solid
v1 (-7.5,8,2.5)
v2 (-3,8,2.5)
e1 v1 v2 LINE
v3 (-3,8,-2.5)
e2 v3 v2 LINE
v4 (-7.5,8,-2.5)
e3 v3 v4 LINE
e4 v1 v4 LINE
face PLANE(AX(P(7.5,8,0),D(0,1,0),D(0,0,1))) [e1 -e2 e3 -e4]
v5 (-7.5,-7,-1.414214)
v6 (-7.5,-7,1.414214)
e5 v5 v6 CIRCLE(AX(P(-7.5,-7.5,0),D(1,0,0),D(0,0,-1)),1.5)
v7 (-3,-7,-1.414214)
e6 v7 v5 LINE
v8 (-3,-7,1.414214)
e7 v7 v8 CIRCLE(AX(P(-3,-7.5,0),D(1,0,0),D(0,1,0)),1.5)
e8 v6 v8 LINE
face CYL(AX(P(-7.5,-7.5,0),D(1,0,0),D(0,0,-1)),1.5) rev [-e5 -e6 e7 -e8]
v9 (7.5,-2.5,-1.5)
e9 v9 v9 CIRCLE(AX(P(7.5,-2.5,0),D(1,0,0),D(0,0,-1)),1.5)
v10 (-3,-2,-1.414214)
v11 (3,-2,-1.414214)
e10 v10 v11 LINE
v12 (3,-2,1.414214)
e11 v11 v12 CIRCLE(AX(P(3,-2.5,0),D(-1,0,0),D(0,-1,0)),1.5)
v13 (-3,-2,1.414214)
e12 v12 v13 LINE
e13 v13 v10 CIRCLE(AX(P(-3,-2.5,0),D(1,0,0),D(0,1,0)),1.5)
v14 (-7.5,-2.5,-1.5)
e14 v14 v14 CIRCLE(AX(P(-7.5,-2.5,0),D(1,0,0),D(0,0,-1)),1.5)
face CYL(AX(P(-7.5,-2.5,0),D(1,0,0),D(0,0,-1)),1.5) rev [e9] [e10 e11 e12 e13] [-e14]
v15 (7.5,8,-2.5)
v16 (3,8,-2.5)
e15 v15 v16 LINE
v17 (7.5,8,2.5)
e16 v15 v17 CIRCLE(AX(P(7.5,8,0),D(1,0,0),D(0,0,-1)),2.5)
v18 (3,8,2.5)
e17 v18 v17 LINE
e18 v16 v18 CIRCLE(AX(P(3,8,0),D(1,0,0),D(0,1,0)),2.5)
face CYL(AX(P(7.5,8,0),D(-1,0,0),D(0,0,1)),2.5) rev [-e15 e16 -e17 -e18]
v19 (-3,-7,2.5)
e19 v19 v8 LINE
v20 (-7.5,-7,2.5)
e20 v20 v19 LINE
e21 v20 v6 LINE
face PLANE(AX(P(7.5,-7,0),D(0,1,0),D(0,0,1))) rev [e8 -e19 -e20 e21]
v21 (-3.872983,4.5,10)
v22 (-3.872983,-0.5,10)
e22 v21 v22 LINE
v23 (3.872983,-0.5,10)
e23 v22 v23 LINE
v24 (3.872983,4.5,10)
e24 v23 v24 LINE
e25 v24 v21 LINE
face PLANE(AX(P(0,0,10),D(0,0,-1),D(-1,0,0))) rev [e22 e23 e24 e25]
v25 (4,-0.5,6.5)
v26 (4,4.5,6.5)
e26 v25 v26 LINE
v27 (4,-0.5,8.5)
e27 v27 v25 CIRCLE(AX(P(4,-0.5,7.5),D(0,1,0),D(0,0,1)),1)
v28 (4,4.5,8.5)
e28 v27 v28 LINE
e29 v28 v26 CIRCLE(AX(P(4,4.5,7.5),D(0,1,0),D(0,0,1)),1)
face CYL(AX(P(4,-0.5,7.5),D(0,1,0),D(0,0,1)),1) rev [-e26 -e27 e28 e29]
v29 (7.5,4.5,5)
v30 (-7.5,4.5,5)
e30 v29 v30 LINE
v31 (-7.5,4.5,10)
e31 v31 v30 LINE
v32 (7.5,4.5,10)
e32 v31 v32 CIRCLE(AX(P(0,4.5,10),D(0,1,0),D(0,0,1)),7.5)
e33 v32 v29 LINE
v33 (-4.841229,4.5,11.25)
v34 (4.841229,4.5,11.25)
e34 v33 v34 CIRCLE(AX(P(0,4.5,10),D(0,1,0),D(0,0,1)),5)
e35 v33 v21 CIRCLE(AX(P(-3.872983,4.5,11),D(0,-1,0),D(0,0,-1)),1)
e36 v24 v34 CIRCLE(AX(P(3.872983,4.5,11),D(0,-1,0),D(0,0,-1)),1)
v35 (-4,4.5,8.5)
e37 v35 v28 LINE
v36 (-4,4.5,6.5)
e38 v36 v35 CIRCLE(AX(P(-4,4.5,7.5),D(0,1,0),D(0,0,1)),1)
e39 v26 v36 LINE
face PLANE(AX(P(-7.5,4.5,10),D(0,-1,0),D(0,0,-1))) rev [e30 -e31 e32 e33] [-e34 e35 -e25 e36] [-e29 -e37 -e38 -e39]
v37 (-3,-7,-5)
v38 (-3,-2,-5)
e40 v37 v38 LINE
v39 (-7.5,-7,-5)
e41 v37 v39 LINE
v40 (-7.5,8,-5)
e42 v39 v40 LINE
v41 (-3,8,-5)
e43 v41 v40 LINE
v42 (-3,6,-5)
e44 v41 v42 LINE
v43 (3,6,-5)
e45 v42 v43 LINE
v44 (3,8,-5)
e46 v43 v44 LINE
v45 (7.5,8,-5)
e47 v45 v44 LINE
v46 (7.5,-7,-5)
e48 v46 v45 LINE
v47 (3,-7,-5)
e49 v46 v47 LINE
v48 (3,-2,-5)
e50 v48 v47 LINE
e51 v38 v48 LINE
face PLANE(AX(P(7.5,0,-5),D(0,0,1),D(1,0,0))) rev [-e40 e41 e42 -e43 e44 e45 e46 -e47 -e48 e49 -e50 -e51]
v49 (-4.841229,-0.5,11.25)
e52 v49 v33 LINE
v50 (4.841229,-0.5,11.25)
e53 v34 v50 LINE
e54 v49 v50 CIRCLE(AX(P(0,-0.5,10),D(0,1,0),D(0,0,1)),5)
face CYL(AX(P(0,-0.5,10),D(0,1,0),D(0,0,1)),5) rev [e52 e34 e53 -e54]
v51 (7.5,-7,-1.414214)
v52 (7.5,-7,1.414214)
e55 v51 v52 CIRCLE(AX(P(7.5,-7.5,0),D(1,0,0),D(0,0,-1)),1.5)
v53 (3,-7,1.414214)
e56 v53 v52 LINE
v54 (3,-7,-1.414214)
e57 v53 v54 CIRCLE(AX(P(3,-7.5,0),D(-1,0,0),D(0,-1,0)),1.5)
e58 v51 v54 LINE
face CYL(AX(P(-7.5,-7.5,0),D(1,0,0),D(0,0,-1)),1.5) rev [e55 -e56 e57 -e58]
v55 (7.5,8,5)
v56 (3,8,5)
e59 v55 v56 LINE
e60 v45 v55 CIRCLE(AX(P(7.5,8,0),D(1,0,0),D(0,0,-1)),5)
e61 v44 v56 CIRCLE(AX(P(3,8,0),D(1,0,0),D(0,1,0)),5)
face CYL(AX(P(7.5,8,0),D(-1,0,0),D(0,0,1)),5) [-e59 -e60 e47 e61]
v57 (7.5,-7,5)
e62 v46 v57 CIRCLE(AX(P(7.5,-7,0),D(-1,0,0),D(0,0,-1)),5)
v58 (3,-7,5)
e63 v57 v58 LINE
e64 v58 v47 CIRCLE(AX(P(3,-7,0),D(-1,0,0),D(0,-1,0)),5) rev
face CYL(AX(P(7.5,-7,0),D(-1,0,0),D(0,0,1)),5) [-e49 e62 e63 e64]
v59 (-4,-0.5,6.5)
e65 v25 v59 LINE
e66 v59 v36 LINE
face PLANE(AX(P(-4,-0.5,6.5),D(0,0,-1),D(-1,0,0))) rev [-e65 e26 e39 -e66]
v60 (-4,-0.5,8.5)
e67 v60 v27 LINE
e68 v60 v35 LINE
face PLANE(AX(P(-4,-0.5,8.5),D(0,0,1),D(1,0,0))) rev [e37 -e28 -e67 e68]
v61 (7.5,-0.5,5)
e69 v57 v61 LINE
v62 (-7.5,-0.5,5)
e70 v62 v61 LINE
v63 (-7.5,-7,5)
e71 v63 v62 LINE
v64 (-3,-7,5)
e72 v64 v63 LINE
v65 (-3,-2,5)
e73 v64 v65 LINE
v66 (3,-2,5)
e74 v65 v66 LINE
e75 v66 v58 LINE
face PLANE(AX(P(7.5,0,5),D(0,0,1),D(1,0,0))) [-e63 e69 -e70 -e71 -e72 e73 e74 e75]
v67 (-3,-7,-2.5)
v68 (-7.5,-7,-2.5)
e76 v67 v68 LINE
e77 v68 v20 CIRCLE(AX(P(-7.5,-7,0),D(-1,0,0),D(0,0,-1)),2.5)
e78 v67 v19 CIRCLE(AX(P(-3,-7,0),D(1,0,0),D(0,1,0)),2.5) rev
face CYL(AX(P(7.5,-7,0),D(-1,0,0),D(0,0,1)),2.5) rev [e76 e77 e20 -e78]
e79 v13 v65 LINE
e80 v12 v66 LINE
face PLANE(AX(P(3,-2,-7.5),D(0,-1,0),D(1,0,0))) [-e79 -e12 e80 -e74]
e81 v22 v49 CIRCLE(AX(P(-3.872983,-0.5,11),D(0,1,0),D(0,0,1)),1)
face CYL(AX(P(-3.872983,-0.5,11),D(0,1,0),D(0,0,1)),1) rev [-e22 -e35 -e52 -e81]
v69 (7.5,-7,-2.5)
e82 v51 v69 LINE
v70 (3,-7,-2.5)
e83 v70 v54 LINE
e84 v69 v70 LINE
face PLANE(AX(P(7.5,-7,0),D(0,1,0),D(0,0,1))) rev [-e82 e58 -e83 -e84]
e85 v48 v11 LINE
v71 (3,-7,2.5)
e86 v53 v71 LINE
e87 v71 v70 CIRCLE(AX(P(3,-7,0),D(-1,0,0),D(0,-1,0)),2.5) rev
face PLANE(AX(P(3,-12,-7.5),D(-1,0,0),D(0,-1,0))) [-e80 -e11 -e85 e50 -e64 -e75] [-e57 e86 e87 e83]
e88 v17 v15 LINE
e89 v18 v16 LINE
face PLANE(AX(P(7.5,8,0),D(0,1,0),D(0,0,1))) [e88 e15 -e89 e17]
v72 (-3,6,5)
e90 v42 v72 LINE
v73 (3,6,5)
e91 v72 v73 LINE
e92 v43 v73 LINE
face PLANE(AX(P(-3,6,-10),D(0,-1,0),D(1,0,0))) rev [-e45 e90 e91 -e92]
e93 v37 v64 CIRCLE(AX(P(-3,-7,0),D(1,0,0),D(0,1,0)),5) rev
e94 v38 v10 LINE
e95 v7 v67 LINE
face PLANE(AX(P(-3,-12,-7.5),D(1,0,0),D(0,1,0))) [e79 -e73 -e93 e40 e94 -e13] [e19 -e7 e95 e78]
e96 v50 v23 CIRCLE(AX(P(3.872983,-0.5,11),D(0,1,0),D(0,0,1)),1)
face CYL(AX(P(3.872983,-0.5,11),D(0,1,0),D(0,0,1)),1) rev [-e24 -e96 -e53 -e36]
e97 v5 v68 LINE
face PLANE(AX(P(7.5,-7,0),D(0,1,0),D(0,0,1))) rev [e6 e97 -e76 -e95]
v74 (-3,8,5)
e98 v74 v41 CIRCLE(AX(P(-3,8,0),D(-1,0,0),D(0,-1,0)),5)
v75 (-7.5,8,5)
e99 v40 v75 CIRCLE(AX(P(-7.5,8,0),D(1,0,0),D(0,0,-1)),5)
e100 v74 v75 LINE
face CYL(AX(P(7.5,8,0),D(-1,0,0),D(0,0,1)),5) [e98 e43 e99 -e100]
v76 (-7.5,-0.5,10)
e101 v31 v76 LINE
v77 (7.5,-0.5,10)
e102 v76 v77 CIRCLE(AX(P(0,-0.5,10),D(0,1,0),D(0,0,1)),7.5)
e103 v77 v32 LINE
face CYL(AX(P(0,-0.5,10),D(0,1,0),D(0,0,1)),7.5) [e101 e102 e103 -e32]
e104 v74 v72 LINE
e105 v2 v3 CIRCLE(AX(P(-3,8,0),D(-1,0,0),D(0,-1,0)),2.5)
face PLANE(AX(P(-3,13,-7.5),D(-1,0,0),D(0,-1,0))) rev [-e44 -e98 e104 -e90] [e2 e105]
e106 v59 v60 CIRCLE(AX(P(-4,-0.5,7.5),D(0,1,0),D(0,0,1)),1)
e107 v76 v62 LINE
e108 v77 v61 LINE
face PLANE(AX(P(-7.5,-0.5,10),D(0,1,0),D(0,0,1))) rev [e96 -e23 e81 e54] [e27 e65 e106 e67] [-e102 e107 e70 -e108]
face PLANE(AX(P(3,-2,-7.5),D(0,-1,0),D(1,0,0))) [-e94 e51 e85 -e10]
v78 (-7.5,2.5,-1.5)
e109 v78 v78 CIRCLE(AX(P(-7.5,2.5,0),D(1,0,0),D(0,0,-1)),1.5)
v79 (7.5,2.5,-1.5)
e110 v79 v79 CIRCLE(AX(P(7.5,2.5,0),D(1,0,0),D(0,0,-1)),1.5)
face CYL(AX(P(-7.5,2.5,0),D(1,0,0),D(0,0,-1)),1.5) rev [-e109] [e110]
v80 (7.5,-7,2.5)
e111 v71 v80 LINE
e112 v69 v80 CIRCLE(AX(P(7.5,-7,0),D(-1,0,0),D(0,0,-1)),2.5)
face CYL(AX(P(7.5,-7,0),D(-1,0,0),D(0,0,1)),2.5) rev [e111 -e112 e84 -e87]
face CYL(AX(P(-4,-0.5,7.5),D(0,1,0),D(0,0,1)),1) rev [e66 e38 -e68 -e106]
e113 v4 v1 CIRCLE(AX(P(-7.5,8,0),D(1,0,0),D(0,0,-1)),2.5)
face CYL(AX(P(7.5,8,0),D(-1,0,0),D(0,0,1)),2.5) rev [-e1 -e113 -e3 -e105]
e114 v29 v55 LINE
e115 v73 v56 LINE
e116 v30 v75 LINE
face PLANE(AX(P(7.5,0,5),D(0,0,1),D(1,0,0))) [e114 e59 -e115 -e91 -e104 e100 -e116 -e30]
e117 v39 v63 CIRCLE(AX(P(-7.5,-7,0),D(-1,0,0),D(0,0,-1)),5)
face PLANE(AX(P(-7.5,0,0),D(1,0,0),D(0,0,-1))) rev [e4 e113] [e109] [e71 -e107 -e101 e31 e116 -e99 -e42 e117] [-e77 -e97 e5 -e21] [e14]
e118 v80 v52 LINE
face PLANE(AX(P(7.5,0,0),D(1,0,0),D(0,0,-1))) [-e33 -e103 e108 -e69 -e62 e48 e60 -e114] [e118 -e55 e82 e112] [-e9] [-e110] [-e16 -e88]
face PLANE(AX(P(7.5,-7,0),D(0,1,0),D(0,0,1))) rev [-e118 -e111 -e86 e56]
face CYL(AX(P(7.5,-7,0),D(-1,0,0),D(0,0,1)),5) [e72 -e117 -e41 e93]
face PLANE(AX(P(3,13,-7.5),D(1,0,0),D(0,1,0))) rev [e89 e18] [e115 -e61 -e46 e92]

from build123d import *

# Parameters (mm, degrees)
SKETCH2_R           = 2.5
BOSS_EXTRUDE2_DEPTH = 7.5
SKETCH3_W           = 6
SKETCH3_H           = 10
CUT_EXTRUDE1_DEPTH  = 7.5
SKETCH4_R           = 1.5
CUT_EXTRUDE2_DEPTH  = 15
SKETCH6_W           = 6
SKETCH6_H           = 2
CUT_EXTRUDE3_DEPTH  = 15
SKETCH7_W           = 15
SKETCH7_H           = 5
BOSS_EXTRUDE3_DEPTH = 5
BOSS_EXTRUDE4_DEPTH = 5
FILLET1_R           = 1
CUT_EXTRUDE4_DEPTH  = 5


with BuildPart() as part:
    # Sketch2 → Boss-Extrude2 (new, symmetric)
    with BuildSketch(Plane(origin=(0, 0, 0), x_dir=(0, 0, -1), z_dir=(1, 0, 0))):
        with BuildLine():
            Line((-5, 8), (-5, -7))
            Line((-5, -7), (5, -7))
            Line((5, -7), (5, 8))
            ThreePointArc((5, 8), (0, 13), (-5, 8))
        make_face()
        with Locations((0, 8)):
            Circle(SKETCH2_R, mode=Mode.SUBTRACT)
    boss_extrude2 = extrude(amount=BOSS_EXTRUDE2_DEPTH, both=True)

    # Sketch3 → Cut-Extrude1 (cut, symmetric)
    with BuildSketch(Plane.XY):
        with Locations((0, 8)):
            Rectangle(SKETCH3_W, SKETCH3_H)
    cut_extrude1 = extrude(amount=CUT_EXTRUDE1_DEPTH, both=True, mode=Mode.SUBTRACT)

    # Mirror1: Boss-Extrude2, Cut-Extrude1 across plane
    add(boss_extrude2.mirror(Plane(origin=(0, 0.5, 0), x_dir=(0, 0, 1), z_dir=(0, -1, 0))))
    add(cut_extrude1.mirror(Plane(origin=(0, 0.5, 0), x_dir=(0, 0, 1), z_dir=(0, -1, 0))), mode=Mode.SUBTRACT)

    # Sketch4 → Cut-Extrude2 (cut)
    with BuildSketch(Plane(origin=(7.5, 0, 0), x_dir=(0, 0, -1), z_dir=(1, 0, 0))):
        with Locations((0, 2.5)):
            Circle(SKETCH4_R)
        with Locations((0, -2.5)):
            Circle(SKETCH4_R)
        with Locations((0, -7.5)):
            Circle(SKETCH4_R)
    extrude(amount=-CUT_EXTRUDE2_DEPTH, mode=Mode.SUBTRACT)

    # Sketch6 → Cut-Extrude3 (cut)
    with BuildSketch(Plane.XY.offset(5)):
        with Locations((0, 7)):
            Rectangle(SKETCH6_W, SKETCH6_H)
    extrude(amount=-CUT_EXTRUDE3_DEPTH, mode=Mode.SUBTRACT)

    # Sketch7 → Boss-Extrude3 (add)
    with BuildSketch(Plane.XY.offset(5)):
        with Locations((0, 2)):
            Rectangle(SKETCH7_W, SKETCH7_H)
    extrude(amount=BOSS_EXTRUDE3_DEPTH)

    # Sketch8 → Boss-Extrude4 (add)
    with BuildSketch(Plane(origin=(0, 4.5, 0), x_dir=(1, 0, 0), z_dir=(0, 1, 0))):
        with BuildLine():
            ThreePointArc((5, -10), (0, -15), (-5, -10))
            Line((-5, -10), (-7.5, -10))
            ThreePointArc((-7.5, -10), (0, -17.5), (7.5, -10))
            Line((7.5, -10), (5, -10))
        make_face()
    extrude(amount=-BOSS_EXTRUDE4_DEPTH)

    # Fillet1
    fillet1_edges = [part.edges().sort_by_distance(p)[0] for p in [
        (-5, 2, 10),
        (5, 2, 10),
    ]]
    fillet(fillet1_edges, radius=FILLET1_R)

    # Sketch9 → Cut-Extrude4 (cut)
    with BuildSketch(Plane(origin=(0, 4.5, 0), x_dir=(1, 0, 0), z_dir=(0, 1, 0))):
        with BuildLine():
            Line((-4, -6.5), (4, -6.5))
            ThreePointArc((4, -6.5), (5, -7.5), (4, -8.5))
            Line((4, -8.5), (-4, -8.5))
            ThreePointArc((-4, -8.5), (-5, -7.5), (-4, -6.5))
        make_face()
    extrude(amount=-CUT_EXTRUDE4_DEPTH, mode=Mode.SUBTRACT)


solid = part.part
